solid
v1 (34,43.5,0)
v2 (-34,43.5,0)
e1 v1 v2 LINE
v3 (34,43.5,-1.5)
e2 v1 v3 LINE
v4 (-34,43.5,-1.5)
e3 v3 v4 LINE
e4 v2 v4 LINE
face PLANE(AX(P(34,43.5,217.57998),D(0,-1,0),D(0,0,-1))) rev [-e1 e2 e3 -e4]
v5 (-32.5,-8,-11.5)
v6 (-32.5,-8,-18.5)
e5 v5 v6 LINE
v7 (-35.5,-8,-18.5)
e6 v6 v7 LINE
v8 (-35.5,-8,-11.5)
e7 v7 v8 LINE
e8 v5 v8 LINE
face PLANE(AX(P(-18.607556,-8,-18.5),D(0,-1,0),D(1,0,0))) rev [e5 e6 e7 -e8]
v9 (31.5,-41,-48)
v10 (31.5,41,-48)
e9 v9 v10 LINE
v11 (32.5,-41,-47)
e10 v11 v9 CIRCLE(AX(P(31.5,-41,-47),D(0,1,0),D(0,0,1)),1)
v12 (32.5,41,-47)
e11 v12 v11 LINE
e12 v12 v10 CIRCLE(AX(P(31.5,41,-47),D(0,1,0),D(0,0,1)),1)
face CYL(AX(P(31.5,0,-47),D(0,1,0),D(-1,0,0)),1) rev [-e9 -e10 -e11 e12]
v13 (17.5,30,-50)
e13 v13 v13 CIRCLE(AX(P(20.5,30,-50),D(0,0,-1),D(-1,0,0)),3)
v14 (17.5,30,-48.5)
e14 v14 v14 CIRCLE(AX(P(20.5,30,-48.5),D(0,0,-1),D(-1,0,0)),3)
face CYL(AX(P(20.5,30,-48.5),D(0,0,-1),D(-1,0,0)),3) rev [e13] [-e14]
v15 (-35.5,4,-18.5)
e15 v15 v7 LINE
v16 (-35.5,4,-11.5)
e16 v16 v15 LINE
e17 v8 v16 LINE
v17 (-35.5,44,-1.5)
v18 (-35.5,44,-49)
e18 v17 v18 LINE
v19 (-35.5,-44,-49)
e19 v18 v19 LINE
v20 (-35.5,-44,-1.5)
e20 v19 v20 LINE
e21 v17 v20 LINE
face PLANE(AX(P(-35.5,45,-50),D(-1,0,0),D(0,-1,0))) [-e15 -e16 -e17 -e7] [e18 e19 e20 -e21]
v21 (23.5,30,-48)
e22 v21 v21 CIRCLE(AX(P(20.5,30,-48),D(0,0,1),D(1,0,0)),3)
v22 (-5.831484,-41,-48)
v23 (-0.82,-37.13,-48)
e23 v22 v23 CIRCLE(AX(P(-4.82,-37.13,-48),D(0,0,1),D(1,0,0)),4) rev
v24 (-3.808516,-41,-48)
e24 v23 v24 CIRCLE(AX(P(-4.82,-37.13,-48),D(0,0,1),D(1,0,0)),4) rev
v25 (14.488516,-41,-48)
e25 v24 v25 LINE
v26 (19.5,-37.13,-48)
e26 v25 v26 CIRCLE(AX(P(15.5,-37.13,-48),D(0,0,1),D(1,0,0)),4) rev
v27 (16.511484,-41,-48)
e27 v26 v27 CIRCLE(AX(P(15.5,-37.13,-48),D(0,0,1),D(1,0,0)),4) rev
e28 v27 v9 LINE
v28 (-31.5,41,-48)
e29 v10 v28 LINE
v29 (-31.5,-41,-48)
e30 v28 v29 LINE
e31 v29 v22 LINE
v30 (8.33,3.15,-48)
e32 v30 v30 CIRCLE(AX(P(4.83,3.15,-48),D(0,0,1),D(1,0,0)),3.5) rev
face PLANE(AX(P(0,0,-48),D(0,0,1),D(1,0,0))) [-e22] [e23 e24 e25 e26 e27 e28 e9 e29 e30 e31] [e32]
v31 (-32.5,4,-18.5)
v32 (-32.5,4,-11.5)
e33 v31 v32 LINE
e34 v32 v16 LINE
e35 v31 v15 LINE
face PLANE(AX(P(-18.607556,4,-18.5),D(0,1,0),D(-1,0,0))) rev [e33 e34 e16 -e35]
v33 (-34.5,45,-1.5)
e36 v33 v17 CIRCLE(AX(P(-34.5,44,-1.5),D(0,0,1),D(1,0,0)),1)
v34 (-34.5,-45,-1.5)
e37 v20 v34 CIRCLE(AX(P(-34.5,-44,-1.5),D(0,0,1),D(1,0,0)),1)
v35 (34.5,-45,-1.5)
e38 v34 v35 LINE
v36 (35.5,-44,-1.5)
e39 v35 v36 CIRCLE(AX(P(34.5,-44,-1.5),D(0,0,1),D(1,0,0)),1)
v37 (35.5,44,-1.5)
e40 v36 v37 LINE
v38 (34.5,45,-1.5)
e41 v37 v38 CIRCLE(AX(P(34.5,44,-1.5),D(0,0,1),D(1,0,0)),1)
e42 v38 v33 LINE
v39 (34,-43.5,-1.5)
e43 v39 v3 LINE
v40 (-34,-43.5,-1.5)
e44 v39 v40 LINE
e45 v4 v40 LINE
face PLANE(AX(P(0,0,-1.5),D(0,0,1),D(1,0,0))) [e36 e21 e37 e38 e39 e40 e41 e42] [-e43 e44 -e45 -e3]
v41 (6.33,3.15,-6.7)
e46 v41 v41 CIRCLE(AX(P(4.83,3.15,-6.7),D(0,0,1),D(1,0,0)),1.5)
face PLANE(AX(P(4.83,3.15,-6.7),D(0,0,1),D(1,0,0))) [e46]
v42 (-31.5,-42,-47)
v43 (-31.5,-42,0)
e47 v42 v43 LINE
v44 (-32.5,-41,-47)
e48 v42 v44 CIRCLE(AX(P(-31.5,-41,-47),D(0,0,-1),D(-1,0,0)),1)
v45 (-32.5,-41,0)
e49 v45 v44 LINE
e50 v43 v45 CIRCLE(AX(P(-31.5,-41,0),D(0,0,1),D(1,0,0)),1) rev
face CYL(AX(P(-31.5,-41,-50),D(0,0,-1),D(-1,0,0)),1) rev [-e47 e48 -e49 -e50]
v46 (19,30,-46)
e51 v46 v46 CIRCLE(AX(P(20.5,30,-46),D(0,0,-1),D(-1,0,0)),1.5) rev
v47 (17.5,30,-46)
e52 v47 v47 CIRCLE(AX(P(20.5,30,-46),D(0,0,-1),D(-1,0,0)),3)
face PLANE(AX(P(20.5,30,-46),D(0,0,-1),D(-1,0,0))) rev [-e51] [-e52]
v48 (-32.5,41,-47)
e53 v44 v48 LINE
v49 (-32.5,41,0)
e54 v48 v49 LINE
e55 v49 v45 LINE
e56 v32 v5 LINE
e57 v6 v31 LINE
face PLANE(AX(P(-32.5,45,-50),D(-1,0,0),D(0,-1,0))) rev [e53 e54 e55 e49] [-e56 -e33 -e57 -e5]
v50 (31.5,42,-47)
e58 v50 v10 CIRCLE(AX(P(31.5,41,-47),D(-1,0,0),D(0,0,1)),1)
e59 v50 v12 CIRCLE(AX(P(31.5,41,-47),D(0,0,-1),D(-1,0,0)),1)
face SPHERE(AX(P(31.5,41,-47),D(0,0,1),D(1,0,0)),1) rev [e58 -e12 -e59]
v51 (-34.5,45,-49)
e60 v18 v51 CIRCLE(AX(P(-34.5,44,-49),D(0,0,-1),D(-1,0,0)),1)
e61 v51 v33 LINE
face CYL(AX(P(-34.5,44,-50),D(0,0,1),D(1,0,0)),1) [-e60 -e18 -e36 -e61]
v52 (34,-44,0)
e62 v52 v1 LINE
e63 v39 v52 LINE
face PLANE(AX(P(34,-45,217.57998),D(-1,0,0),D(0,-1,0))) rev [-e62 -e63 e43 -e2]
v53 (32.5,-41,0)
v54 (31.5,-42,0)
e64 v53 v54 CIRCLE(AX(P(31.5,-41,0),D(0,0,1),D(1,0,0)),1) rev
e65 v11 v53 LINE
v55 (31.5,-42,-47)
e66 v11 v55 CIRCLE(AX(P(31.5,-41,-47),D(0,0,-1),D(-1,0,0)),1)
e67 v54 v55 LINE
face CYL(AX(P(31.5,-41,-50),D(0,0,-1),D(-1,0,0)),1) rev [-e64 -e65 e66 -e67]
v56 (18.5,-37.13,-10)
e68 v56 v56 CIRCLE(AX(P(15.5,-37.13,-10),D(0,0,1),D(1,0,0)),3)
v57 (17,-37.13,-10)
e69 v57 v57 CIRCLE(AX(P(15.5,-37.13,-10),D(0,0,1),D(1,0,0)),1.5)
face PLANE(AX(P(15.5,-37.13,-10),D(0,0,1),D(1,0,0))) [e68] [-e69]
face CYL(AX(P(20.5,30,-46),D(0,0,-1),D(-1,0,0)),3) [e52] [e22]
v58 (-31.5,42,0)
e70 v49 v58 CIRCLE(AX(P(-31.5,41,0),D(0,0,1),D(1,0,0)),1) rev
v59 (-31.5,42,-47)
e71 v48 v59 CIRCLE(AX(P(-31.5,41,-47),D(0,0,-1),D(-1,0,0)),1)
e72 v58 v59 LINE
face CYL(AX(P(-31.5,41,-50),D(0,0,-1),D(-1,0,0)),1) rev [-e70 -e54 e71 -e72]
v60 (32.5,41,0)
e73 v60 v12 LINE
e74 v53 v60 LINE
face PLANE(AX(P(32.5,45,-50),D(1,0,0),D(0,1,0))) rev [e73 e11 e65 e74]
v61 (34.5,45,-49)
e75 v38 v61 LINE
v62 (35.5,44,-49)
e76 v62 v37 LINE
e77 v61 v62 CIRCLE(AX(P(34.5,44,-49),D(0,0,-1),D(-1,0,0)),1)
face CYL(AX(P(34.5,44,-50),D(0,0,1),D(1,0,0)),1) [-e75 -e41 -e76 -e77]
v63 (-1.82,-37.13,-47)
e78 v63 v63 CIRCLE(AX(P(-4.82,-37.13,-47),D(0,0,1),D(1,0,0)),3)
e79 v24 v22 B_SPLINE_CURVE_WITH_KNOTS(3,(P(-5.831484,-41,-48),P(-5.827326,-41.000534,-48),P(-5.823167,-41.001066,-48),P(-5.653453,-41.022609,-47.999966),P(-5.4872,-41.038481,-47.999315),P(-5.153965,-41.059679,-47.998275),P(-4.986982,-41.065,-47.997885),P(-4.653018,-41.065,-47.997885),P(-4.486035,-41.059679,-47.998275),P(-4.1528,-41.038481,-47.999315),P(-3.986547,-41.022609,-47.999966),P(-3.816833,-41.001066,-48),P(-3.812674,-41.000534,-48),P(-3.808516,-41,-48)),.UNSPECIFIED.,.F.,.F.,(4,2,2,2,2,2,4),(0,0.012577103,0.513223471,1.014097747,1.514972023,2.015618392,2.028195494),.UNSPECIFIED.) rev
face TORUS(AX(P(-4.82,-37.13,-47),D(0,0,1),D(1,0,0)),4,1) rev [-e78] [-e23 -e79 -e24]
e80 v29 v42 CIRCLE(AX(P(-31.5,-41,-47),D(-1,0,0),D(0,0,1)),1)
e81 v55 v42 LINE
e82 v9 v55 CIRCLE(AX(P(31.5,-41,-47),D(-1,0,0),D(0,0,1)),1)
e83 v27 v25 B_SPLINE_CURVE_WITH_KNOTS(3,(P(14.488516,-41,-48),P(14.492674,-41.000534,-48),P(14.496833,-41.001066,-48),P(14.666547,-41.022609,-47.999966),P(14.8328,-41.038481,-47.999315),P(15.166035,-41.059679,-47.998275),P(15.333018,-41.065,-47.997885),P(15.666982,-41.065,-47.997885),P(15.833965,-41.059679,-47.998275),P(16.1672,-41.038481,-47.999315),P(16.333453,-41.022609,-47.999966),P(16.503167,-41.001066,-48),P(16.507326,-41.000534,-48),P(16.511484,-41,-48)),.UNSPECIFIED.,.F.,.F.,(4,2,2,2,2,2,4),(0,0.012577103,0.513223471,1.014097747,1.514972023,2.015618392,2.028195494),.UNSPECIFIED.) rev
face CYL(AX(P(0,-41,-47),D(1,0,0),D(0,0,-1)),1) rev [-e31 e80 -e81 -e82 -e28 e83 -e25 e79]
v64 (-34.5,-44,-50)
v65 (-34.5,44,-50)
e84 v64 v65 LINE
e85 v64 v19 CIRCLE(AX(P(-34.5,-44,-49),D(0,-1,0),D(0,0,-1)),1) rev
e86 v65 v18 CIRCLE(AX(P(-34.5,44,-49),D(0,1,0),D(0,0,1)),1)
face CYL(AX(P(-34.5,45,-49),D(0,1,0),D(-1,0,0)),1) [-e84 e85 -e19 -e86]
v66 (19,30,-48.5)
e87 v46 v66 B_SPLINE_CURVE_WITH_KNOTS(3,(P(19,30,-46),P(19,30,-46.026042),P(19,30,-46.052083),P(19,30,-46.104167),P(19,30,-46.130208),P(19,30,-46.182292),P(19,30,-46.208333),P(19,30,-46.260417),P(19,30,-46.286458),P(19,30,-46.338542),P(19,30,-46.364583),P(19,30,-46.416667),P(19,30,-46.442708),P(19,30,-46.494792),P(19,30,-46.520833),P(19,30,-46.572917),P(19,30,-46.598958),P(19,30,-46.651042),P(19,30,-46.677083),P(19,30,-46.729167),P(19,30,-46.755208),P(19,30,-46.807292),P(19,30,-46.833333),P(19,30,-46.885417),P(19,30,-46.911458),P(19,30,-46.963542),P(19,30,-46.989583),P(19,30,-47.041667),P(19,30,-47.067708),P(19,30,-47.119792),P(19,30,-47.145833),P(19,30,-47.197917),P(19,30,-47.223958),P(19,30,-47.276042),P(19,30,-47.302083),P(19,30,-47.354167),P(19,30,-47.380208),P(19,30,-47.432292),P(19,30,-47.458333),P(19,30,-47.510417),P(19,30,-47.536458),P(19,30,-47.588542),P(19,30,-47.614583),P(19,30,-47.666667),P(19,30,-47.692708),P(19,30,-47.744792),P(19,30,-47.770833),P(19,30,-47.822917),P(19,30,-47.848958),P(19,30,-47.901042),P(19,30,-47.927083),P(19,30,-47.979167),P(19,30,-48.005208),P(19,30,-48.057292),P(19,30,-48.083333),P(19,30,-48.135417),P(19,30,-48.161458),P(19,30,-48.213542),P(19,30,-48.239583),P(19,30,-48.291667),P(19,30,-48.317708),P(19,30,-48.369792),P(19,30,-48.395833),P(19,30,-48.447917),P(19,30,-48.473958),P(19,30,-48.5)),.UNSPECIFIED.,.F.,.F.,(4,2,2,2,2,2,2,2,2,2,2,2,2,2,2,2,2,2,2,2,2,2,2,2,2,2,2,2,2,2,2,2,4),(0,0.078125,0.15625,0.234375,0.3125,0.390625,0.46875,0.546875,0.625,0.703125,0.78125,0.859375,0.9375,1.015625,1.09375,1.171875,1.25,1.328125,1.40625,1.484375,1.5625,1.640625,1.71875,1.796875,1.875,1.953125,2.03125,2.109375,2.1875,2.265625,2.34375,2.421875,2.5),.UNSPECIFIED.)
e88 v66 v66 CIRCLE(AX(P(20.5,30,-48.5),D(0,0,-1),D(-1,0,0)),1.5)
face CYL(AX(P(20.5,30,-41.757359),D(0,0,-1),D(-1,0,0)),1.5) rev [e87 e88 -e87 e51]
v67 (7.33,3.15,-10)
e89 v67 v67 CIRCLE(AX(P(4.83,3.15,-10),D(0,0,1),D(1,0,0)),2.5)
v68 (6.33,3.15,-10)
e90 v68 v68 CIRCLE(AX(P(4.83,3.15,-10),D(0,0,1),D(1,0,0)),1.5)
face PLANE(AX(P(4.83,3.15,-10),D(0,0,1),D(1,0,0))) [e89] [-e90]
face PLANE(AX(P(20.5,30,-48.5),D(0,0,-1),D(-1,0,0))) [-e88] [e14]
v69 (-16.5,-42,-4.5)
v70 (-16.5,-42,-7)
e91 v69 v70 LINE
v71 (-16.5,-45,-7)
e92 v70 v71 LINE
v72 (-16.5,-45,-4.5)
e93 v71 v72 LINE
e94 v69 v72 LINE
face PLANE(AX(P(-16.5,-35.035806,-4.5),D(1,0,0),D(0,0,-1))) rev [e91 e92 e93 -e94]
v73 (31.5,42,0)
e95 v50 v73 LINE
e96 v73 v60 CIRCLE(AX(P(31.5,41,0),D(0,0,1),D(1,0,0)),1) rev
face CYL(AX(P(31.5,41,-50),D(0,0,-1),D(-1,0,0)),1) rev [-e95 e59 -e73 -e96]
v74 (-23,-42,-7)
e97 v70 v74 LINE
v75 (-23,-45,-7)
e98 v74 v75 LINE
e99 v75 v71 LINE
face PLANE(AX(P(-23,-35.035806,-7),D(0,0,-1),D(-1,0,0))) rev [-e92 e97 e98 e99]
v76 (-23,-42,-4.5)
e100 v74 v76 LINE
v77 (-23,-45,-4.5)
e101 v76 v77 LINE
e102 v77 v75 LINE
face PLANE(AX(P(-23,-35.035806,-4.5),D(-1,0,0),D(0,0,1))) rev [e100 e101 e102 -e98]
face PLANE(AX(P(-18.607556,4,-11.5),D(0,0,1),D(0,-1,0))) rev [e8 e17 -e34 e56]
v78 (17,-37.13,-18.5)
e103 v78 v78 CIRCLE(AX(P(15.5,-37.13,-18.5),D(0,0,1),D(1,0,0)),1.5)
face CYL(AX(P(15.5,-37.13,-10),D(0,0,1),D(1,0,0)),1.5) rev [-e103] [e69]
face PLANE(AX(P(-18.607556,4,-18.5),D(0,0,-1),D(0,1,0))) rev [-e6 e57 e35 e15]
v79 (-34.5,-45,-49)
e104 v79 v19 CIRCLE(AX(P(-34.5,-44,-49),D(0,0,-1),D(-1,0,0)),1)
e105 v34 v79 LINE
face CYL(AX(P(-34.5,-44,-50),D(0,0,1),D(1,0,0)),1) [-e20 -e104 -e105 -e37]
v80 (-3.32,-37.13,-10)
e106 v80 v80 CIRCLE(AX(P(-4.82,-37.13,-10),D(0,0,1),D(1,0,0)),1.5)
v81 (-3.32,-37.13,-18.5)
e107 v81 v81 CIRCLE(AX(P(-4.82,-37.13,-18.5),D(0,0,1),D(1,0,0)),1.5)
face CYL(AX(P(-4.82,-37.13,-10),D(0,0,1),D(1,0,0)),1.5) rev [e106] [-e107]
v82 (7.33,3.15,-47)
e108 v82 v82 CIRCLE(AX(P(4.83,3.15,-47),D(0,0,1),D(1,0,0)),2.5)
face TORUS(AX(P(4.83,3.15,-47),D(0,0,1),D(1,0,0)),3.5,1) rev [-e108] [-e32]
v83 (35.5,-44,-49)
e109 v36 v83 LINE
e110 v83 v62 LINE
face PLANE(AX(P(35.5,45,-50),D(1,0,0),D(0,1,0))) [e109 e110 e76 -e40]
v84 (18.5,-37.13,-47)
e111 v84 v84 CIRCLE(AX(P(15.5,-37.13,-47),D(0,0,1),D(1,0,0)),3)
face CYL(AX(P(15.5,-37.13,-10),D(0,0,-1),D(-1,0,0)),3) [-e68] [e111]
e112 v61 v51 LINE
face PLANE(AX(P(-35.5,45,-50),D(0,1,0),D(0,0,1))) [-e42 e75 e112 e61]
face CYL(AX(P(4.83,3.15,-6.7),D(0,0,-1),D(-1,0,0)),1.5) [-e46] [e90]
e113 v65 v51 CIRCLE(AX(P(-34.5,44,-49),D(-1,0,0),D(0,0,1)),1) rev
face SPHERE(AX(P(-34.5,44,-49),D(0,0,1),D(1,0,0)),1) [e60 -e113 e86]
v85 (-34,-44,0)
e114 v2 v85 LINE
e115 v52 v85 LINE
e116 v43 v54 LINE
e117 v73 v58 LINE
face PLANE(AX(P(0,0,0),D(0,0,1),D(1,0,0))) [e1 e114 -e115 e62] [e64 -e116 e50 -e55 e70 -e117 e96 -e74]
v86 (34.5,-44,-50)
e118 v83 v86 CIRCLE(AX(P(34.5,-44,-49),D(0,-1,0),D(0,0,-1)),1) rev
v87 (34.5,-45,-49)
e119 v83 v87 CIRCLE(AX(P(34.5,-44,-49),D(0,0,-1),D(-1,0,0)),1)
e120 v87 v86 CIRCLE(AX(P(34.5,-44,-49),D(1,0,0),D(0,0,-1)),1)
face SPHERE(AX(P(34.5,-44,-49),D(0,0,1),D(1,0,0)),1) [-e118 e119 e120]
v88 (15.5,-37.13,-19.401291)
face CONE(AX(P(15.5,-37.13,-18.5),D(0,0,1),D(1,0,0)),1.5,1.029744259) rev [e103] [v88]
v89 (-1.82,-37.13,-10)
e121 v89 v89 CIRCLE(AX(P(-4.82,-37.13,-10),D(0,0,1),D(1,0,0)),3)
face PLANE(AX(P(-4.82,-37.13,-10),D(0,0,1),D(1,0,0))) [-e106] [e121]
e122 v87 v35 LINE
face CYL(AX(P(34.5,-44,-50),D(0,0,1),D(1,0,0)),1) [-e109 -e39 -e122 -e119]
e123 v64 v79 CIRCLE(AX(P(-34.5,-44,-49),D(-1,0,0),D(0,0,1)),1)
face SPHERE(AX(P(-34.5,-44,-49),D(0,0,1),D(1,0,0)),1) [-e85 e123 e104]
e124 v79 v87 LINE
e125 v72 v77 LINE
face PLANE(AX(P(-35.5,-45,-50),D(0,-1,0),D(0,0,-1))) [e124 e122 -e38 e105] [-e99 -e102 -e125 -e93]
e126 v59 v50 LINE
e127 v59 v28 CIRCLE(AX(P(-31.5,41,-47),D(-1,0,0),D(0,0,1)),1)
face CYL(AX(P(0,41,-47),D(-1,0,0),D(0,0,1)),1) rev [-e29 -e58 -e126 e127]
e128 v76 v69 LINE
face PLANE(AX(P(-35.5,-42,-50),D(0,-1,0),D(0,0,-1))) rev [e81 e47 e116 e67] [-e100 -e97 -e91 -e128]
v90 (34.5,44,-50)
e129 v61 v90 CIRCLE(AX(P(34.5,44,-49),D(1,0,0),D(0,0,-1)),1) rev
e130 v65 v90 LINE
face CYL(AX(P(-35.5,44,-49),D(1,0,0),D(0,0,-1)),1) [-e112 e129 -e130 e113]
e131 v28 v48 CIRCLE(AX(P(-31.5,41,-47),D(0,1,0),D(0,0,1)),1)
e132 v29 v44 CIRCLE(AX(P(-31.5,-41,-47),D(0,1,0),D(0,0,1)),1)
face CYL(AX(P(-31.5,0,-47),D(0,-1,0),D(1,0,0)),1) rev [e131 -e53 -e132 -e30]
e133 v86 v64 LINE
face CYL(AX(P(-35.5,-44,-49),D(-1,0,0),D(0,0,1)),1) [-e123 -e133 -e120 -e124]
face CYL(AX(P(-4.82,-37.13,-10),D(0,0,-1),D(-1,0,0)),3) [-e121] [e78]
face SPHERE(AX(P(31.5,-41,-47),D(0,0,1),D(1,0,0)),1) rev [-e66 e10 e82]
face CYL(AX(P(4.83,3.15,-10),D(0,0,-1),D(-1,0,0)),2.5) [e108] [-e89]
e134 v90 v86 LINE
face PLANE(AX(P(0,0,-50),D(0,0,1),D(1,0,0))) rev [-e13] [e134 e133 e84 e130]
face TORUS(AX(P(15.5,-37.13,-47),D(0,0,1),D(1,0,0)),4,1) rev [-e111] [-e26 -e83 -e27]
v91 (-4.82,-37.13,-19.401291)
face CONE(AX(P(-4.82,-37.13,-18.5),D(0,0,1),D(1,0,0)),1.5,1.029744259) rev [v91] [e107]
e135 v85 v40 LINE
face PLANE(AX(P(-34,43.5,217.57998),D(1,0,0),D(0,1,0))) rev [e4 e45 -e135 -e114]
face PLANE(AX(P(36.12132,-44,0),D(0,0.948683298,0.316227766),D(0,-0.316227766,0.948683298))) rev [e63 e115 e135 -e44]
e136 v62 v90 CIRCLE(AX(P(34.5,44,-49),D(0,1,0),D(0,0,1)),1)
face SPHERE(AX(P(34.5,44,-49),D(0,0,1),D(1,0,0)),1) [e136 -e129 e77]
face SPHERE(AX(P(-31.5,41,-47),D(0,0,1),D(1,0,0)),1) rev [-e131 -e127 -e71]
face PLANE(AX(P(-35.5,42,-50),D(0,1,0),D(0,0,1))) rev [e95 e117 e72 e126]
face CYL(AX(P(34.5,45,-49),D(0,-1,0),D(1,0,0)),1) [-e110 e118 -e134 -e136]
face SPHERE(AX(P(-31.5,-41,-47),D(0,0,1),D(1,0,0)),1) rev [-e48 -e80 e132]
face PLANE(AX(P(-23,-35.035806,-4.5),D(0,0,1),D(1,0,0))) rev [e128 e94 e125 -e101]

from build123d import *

# Parameters (mm, degrees)
SKETCH1_W                    = 71
SKETCH1_H                    = 90
BOSS_EXTRUDE1_DEPTH          = 50
SHELL1_T                     = -3
SHELL1_THICKNESS_2_FACE_W    = 65
SHELL1_THICKNESS_2_FACE_H    = 84
SHELL1_THICKNESS_2_DEPTH     = 1
SKETCH3_W                    = 6.5
SKETCH3_H                    = 2.5
CUT_EXTRUDE1_DEPTH           = 3
SKETCH4_W                    = 7
SKETCH4_H                    = 12
CUT_EXTRUDE2_DEPTH           = 3
SKETCH5_R                    = 3
SKETCH5_R_2                  = 2.5
BOSS_EXTRUDE2_DEPTH          = 38
F_3_0_3_DIAMETER_HOLE1_D     = 3
F_3_0_3_DIAMETER_HOLE1_DEPTH = 8.5
F_3_0_3_DIAMETER_HOLE1_TIP   = 0.901290929
FILLET1_R                    = 1
FILLET2_R                    = 1
SKETCH22_R                   = 1.5
BOSS_EXTRUDE4_DEPTH          = 3.3
SKETCH23_R                   = 3
BOSS_EXTRUDE5_DEPTH          = 4
CUT_EXTRUDE3_START           = -1.5
CUT_EXTRUDE3_DEPTH           = 1.5
CUT_EXTRUDE4_DEPTH           = 68
SKETCH29_R                   = 3
CUT_EXTRUDE5_DEPTH           = 1.5
SKETCH30_R                   = 1.5
CUT_EXTRUDE6_DEPTH           = 2.5


# Read off the part's stored shape, not the designer's step: Cut-Extrude3
with BuildPart() as part:
    # Sketch1 → Boss-Extrude1 (new body)
    with BuildSketch(Plane.XY):
        Rectangle(SKETCH1_W, SKETCH1_H)
    extrude(amount=-BOSS_EXTRUDE1_DEPTH)

    # Shell1
    shell1_openings = [part.faces().sort_by_distance(p)[0] for p in [
        (0, 0, 0),
    ]]
    offset(amount=SHELL1_T, openings=shell1_openings, kind=Kind.INTERSECTION)

    # Shell1 thickness 2 face (on inner face of the shell) → Shell1 thickness 2 (cut)
    with BuildSketch(Plane(origin=(0, 0, -47), x_dir=(-1, 0, 0), z_dir=(0, 0, -1))):
        Rectangle(SHELL1_THICKNESS_2_FACE_W, SHELL1_THICKNESS_2_FACE_H)
    extrude(amount=SHELL1_THICKNESS_2_DEPTH, mode=Mode.SUBTRACT)

    # Sketch3 → Cut-Extrude1 (cut)
    with BuildSketch(Plane.XZ.offset(45)):
        with Locations((-19.75, -5.75)):
            Rectangle(SKETCH3_W, SKETCH3_H)
    extrude(amount=-CUT_EXTRUDE1_DEPTH, mode=Mode.SUBTRACT)

    # Sketch4 → Cut-Extrude2 (cut)
    with BuildSketch(Plane.ZY.offset(35.5)):
        with Locations((-15, -2)):
            Rectangle(SKETCH4_W, SKETCH4_H)
    extrude(amount=-CUT_EXTRUDE2_DEPTH, mode=Mode.SUBTRACT)

    # Sketch5 → Boss-Extrude2 (add)
    with BuildSketch(Plane.XY.offset(-48)):
        with Locations((-4.82, -37.13)):
            Circle(SKETCH5_R)
        with Locations((15.5, -37.13)):
            Circle(SKETCH5_R)
        with Locations((4.83, 3.15)):
            Circle(SKETCH5_R_2)
    extrude(amount=BOSS_EXTRUDE2_DEPTH)

    # Ø3.0 (3) Diameter Hole1
    with Locations(Plane.XY.offset(-10)):
        with Locations((-4.82, -37.13), (15.5, -37.13), (15.5, 6.05), (-4.82, 6.05)):
            Hole(F_3_0_3_DIAMETER_HOLE1_D / 2, depth=F_3_0_3_DIAMETER_HOLE1_DEPTH)
            with Locations((0, 0, -(F_3_0_3_DIAMETER_HOLE1_DEPTH + F_3_0_3_DIAMETER_HOLE1_TIP / 2))):  # 118° drill point
                Cone(0, F_3_0_3_DIAMETER_HOLE1_D / 2, F_3_0_3_DIAMETER_HOLE1_TIP, mode=Mode.SUBTRACT)

    # Fillet1
    fillet1_edges = [part.edges().sort_by_distance(p)[0] for p in [
        (-35.5, 0, -50),
        (0, -45, -50),
        (32.5, 42, -24),
        (32.5, -42, -24),
        (-32.5, -42, -24),
        (-32.5, 42, -24),
        (35.5, 0, -50),
        (0, 45, -50),
        (35.5, -45, -25),
        (-35.5, -45, -25),
        (-35.5, 45, -25),
        (35.5, 45, -25),
    ]]
    fillet(fillet1_edges, radius=FILLET1_R)

    # Fillet2
    # the kernel refuses this fillet: 1 mm, written as the material it adds along each edge
    with BuildSketch(Plane(origin=(-4.82, -37.13, -48), x_dir=(1, 0, 0), z_dir=(0, -1, 0))) as fillet2_piece_1:
        with BuildLine():
            CenterArc((3 + FILLET2_R, FILLET2_R), FILLET2_R, 180, 90)
            Line((3, FILLET2_R), (3, 0))
            Line((3, 0), (3 + FILLET2_R, 0))
        make_face()
    revolve(axis=Axis((-4.82, -37.13, -48), (0, 0, 1)))
    with BuildSketch(Plane(origin=(15.5, -37.13, -48), x_dir=(1, 0, 0), z_dir=(0, -1, 0))) as fillet2_piece_2:
        with BuildLine():
            CenterArc((3 + FILLET2_R, FILLET2_R), FILLET2_R, 180, 90)
            Line((3, FILLET2_R), (3, 0))
            Line((3, 0), (3 + FILLET2_R, 0))
        make_face()
    revolve(axis=Axis((15.5, -37.13, -48), (0, 0, 1)))
    with BuildSketch(Plane(origin=(4.83, 3.15, -48), x_dir=(1, 0, 0), z_dir=(0, -1, 0))) as fillet2_piece_3:
        with BuildLine():
            CenterArc((2.5 + FILLET2_R, FILLET2_R), FILLET2_R, 180, 90)
            Line((2.5, FILLET2_R), (2.5, 0))
            Line((2.5, 0), (2.5 + FILLET2_R, 0))
        make_face()
    revolve(axis=Axis((4.83, 3.15, -48), (0, 0, 1)))
    with BuildSketch(Plane(origin=(31.5, 42, -48), x_dir=(0, 0, 1), z_dir=(-1, 0, 0)), Plane(origin=(-31.5, -42, -48), x_dir=(0, 0, 1), z_dir=(1, 0, 0))) as fillet2_piece_4:
        with BuildLine():
            CenterArc((FILLET2_R, -FILLET2_R), FILLET2_R, 90, 90)
            Line((0, -FILLET2_R), (0, 0))
            Line((0, 0), (FILLET2_R, 0))
        make_face()
    extrude(amount=63)
    with BuildSketch(Plane(origin=(32.5, -41, -48), x_dir=(0, 0, 1), z_dir=(0, 1, 0)), Plane(origin=(-32.5, 41, -48), x_dir=(0, 0, 1), z_dir=(0, -1, 0))) as fillet2_piece_5:
        with BuildLine():
            CenterArc((FILLET2_R, -FILLET2_R), FILLET2_R, 90, 90)
            Line((0, -FILLET2_R), (0, 0))
            Line((0, 0), (FILLET2_R, 0))
        make_face()
    extrude(amount=82)
    with BuildSketch(Plane(origin=(-31.5, -41, -48), x_dir=(-1, 0, 0), z_dir=(0, 1, 0))) as fillet2_piece_6:
        with BuildLine():
            CenterArc((1 - FILLET2_R, FILLET2_R), FILLET2_R, 270, 90)
            Line((1 - FILLET2_R, 0), (1, 0))
            Line((1, 0), (1, FILLET2_R))
        make_face()
    revolve(axis=Axis((-31.5, -41, -48), (0, 0, 1)), revolution_arc=90)
    with BuildSketch(Plane(origin=(-31.5, 41, -48), x_dir=(0, 1, 0), z_dir=(1, 0, 0))) as fillet2_piece_7:
        with BuildLine():
            CenterArc((1 - FILLET2_R, FILLET2_R), FILLET2_R, 270, 90)
            Line((1 - FILLET2_R, 0), (1, 0))
            Line((1, 0), (1, FILLET2_R))
        make_face()
    revolve(axis=Axis((-31.5, 41, -48), (0, 0, 1)), revolution_arc=90)
    with BuildSketch(Plane(origin=(31.5, -41, -48), x_dir=(0, -1, 0), z_dir=(-1, 0, 0))) as fillet2_piece_8:
        with BuildLine():
            CenterArc((1 - FILLET2_R, FILLET2_R), FILLET2_R, 270, 90)
            Line((1 - FILLET2_R, 0), (1, 0))
            Line((1, 0), (1, FILLET2_R))
        make_face()
    revolve(axis=Axis((31.5, -41, -48), (0, 0, 1)), revolution_arc=90)
    with BuildSketch(Plane(origin=(31.5, 41, -48), x_dir=(0, 1, 0), z_dir=(-1, 0, 0))) as fillet2_piece_9:
        with BuildLine():
            CenterArc((1 - FILLET2_R, -FILLET2_R), FILLET2_R, 0, 90)
            Line((1 - FILLET2_R, 0), (1, 0))
            Line((1, 0), (1, -FILLET2_R))
        make_face()
    revolve(axis=Axis((31.5, 41, -48), (0, 0, -1)), revolution_arc=90)

    # Sketch22 → Boss-Extrude4 (add)
    with BuildSketch(Plane.XY.offset(-10)):
        with Locations((4.83, 3.15)):
            Circle(SKETCH22_R)
    extrude(amount=BOSS_EXTRUDE4_DEPTH)

    # Sketch23 → Boss-Extrude5 (add)
    with BuildSketch(Plane(origin=(0, 0, -50), x_dir=(-1, 0, 0), z_dir=(0, 0, -1))):
        with Locations((-20.5, 30)):
            Circle(SKETCH23_R)
    extrude(amount=-BOSS_EXTRUDE5_DEPTH)

    # Cut-Extrude3 outline → Cut-Extrude3 (cut)
    with BuildSketch(Plane.XY.offset(CUT_EXTRUDE3_START)):
        with BuildLine():
            Line((-34, 43.5), (34, 43.5))
            Line((34, 43.5), (34, -45))
            Line((34, -45), (34.5, -45))
            ThreePointArc((34.5, -45), (35.207106781, -44.707106781), (35.5, -44))
            Line((35.5, -44), (35.5, 44))
            ThreePointArc((35.5, 44), (35.207106781, 44.707106781), (34.5, 45))
            Line((34.5, 45), (-34.5, 45))
            ThreePointArc((-34.5, 45), (-35.207106781, 44.707106781), (-35.5, 44))
            Line((-35.5, 44), (-35.5, -44))
            ThreePointArc((-35.5, -44), (-35.207106781, -44.707106781), (-34.5, -45))
            Line((-34.5, -45), (-34, -45))
            Line((-34, -45), (-34, 43.5))
        make_face()
    extrude(amount=CUT_EXTRUDE3_DEPTH, mode=Mode.SUBTRACT)

    # Sketch26 → Cut-Extrude4 (cut)
    with BuildSketch(Plane.ZY.offset(34)):
        Polygon((0, -45), (0, -44), (-1.5, -43.5), (-1.5, -45), align=None)
    extrude(amount=-CUT_EXTRUDE4_DEPTH, mode=Mode.SUBTRACT)

    # Sketch29 → Cut-Extrude5 (cut)
    with BuildSketch(Plane(origin=(0, 0, -50), x_dir=(-1, 0, 0), z_dir=(0, 0, -1))):
        with Locations((-20.5, 30)):
            Circle(SKETCH29_R)
    extrude(amount=-CUT_EXTRUDE5_DEPTH, mode=Mode.SUBTRACT)

    # Sketch30 → Cut-Extrude6 (cut)
    with BuildSketch(Plane(origin=(0, 0, -48.5), x_dir=(-1, 0, 0), z_dir=(0, 0, -1))):
        with Locations((-20.5, 30)):
            Circle(SKETCH30_R)
    extrude(amount=-CUT_EXTRUDE6_DEPTH, mode=Mode.SUBTRACT)


solid = part.part
